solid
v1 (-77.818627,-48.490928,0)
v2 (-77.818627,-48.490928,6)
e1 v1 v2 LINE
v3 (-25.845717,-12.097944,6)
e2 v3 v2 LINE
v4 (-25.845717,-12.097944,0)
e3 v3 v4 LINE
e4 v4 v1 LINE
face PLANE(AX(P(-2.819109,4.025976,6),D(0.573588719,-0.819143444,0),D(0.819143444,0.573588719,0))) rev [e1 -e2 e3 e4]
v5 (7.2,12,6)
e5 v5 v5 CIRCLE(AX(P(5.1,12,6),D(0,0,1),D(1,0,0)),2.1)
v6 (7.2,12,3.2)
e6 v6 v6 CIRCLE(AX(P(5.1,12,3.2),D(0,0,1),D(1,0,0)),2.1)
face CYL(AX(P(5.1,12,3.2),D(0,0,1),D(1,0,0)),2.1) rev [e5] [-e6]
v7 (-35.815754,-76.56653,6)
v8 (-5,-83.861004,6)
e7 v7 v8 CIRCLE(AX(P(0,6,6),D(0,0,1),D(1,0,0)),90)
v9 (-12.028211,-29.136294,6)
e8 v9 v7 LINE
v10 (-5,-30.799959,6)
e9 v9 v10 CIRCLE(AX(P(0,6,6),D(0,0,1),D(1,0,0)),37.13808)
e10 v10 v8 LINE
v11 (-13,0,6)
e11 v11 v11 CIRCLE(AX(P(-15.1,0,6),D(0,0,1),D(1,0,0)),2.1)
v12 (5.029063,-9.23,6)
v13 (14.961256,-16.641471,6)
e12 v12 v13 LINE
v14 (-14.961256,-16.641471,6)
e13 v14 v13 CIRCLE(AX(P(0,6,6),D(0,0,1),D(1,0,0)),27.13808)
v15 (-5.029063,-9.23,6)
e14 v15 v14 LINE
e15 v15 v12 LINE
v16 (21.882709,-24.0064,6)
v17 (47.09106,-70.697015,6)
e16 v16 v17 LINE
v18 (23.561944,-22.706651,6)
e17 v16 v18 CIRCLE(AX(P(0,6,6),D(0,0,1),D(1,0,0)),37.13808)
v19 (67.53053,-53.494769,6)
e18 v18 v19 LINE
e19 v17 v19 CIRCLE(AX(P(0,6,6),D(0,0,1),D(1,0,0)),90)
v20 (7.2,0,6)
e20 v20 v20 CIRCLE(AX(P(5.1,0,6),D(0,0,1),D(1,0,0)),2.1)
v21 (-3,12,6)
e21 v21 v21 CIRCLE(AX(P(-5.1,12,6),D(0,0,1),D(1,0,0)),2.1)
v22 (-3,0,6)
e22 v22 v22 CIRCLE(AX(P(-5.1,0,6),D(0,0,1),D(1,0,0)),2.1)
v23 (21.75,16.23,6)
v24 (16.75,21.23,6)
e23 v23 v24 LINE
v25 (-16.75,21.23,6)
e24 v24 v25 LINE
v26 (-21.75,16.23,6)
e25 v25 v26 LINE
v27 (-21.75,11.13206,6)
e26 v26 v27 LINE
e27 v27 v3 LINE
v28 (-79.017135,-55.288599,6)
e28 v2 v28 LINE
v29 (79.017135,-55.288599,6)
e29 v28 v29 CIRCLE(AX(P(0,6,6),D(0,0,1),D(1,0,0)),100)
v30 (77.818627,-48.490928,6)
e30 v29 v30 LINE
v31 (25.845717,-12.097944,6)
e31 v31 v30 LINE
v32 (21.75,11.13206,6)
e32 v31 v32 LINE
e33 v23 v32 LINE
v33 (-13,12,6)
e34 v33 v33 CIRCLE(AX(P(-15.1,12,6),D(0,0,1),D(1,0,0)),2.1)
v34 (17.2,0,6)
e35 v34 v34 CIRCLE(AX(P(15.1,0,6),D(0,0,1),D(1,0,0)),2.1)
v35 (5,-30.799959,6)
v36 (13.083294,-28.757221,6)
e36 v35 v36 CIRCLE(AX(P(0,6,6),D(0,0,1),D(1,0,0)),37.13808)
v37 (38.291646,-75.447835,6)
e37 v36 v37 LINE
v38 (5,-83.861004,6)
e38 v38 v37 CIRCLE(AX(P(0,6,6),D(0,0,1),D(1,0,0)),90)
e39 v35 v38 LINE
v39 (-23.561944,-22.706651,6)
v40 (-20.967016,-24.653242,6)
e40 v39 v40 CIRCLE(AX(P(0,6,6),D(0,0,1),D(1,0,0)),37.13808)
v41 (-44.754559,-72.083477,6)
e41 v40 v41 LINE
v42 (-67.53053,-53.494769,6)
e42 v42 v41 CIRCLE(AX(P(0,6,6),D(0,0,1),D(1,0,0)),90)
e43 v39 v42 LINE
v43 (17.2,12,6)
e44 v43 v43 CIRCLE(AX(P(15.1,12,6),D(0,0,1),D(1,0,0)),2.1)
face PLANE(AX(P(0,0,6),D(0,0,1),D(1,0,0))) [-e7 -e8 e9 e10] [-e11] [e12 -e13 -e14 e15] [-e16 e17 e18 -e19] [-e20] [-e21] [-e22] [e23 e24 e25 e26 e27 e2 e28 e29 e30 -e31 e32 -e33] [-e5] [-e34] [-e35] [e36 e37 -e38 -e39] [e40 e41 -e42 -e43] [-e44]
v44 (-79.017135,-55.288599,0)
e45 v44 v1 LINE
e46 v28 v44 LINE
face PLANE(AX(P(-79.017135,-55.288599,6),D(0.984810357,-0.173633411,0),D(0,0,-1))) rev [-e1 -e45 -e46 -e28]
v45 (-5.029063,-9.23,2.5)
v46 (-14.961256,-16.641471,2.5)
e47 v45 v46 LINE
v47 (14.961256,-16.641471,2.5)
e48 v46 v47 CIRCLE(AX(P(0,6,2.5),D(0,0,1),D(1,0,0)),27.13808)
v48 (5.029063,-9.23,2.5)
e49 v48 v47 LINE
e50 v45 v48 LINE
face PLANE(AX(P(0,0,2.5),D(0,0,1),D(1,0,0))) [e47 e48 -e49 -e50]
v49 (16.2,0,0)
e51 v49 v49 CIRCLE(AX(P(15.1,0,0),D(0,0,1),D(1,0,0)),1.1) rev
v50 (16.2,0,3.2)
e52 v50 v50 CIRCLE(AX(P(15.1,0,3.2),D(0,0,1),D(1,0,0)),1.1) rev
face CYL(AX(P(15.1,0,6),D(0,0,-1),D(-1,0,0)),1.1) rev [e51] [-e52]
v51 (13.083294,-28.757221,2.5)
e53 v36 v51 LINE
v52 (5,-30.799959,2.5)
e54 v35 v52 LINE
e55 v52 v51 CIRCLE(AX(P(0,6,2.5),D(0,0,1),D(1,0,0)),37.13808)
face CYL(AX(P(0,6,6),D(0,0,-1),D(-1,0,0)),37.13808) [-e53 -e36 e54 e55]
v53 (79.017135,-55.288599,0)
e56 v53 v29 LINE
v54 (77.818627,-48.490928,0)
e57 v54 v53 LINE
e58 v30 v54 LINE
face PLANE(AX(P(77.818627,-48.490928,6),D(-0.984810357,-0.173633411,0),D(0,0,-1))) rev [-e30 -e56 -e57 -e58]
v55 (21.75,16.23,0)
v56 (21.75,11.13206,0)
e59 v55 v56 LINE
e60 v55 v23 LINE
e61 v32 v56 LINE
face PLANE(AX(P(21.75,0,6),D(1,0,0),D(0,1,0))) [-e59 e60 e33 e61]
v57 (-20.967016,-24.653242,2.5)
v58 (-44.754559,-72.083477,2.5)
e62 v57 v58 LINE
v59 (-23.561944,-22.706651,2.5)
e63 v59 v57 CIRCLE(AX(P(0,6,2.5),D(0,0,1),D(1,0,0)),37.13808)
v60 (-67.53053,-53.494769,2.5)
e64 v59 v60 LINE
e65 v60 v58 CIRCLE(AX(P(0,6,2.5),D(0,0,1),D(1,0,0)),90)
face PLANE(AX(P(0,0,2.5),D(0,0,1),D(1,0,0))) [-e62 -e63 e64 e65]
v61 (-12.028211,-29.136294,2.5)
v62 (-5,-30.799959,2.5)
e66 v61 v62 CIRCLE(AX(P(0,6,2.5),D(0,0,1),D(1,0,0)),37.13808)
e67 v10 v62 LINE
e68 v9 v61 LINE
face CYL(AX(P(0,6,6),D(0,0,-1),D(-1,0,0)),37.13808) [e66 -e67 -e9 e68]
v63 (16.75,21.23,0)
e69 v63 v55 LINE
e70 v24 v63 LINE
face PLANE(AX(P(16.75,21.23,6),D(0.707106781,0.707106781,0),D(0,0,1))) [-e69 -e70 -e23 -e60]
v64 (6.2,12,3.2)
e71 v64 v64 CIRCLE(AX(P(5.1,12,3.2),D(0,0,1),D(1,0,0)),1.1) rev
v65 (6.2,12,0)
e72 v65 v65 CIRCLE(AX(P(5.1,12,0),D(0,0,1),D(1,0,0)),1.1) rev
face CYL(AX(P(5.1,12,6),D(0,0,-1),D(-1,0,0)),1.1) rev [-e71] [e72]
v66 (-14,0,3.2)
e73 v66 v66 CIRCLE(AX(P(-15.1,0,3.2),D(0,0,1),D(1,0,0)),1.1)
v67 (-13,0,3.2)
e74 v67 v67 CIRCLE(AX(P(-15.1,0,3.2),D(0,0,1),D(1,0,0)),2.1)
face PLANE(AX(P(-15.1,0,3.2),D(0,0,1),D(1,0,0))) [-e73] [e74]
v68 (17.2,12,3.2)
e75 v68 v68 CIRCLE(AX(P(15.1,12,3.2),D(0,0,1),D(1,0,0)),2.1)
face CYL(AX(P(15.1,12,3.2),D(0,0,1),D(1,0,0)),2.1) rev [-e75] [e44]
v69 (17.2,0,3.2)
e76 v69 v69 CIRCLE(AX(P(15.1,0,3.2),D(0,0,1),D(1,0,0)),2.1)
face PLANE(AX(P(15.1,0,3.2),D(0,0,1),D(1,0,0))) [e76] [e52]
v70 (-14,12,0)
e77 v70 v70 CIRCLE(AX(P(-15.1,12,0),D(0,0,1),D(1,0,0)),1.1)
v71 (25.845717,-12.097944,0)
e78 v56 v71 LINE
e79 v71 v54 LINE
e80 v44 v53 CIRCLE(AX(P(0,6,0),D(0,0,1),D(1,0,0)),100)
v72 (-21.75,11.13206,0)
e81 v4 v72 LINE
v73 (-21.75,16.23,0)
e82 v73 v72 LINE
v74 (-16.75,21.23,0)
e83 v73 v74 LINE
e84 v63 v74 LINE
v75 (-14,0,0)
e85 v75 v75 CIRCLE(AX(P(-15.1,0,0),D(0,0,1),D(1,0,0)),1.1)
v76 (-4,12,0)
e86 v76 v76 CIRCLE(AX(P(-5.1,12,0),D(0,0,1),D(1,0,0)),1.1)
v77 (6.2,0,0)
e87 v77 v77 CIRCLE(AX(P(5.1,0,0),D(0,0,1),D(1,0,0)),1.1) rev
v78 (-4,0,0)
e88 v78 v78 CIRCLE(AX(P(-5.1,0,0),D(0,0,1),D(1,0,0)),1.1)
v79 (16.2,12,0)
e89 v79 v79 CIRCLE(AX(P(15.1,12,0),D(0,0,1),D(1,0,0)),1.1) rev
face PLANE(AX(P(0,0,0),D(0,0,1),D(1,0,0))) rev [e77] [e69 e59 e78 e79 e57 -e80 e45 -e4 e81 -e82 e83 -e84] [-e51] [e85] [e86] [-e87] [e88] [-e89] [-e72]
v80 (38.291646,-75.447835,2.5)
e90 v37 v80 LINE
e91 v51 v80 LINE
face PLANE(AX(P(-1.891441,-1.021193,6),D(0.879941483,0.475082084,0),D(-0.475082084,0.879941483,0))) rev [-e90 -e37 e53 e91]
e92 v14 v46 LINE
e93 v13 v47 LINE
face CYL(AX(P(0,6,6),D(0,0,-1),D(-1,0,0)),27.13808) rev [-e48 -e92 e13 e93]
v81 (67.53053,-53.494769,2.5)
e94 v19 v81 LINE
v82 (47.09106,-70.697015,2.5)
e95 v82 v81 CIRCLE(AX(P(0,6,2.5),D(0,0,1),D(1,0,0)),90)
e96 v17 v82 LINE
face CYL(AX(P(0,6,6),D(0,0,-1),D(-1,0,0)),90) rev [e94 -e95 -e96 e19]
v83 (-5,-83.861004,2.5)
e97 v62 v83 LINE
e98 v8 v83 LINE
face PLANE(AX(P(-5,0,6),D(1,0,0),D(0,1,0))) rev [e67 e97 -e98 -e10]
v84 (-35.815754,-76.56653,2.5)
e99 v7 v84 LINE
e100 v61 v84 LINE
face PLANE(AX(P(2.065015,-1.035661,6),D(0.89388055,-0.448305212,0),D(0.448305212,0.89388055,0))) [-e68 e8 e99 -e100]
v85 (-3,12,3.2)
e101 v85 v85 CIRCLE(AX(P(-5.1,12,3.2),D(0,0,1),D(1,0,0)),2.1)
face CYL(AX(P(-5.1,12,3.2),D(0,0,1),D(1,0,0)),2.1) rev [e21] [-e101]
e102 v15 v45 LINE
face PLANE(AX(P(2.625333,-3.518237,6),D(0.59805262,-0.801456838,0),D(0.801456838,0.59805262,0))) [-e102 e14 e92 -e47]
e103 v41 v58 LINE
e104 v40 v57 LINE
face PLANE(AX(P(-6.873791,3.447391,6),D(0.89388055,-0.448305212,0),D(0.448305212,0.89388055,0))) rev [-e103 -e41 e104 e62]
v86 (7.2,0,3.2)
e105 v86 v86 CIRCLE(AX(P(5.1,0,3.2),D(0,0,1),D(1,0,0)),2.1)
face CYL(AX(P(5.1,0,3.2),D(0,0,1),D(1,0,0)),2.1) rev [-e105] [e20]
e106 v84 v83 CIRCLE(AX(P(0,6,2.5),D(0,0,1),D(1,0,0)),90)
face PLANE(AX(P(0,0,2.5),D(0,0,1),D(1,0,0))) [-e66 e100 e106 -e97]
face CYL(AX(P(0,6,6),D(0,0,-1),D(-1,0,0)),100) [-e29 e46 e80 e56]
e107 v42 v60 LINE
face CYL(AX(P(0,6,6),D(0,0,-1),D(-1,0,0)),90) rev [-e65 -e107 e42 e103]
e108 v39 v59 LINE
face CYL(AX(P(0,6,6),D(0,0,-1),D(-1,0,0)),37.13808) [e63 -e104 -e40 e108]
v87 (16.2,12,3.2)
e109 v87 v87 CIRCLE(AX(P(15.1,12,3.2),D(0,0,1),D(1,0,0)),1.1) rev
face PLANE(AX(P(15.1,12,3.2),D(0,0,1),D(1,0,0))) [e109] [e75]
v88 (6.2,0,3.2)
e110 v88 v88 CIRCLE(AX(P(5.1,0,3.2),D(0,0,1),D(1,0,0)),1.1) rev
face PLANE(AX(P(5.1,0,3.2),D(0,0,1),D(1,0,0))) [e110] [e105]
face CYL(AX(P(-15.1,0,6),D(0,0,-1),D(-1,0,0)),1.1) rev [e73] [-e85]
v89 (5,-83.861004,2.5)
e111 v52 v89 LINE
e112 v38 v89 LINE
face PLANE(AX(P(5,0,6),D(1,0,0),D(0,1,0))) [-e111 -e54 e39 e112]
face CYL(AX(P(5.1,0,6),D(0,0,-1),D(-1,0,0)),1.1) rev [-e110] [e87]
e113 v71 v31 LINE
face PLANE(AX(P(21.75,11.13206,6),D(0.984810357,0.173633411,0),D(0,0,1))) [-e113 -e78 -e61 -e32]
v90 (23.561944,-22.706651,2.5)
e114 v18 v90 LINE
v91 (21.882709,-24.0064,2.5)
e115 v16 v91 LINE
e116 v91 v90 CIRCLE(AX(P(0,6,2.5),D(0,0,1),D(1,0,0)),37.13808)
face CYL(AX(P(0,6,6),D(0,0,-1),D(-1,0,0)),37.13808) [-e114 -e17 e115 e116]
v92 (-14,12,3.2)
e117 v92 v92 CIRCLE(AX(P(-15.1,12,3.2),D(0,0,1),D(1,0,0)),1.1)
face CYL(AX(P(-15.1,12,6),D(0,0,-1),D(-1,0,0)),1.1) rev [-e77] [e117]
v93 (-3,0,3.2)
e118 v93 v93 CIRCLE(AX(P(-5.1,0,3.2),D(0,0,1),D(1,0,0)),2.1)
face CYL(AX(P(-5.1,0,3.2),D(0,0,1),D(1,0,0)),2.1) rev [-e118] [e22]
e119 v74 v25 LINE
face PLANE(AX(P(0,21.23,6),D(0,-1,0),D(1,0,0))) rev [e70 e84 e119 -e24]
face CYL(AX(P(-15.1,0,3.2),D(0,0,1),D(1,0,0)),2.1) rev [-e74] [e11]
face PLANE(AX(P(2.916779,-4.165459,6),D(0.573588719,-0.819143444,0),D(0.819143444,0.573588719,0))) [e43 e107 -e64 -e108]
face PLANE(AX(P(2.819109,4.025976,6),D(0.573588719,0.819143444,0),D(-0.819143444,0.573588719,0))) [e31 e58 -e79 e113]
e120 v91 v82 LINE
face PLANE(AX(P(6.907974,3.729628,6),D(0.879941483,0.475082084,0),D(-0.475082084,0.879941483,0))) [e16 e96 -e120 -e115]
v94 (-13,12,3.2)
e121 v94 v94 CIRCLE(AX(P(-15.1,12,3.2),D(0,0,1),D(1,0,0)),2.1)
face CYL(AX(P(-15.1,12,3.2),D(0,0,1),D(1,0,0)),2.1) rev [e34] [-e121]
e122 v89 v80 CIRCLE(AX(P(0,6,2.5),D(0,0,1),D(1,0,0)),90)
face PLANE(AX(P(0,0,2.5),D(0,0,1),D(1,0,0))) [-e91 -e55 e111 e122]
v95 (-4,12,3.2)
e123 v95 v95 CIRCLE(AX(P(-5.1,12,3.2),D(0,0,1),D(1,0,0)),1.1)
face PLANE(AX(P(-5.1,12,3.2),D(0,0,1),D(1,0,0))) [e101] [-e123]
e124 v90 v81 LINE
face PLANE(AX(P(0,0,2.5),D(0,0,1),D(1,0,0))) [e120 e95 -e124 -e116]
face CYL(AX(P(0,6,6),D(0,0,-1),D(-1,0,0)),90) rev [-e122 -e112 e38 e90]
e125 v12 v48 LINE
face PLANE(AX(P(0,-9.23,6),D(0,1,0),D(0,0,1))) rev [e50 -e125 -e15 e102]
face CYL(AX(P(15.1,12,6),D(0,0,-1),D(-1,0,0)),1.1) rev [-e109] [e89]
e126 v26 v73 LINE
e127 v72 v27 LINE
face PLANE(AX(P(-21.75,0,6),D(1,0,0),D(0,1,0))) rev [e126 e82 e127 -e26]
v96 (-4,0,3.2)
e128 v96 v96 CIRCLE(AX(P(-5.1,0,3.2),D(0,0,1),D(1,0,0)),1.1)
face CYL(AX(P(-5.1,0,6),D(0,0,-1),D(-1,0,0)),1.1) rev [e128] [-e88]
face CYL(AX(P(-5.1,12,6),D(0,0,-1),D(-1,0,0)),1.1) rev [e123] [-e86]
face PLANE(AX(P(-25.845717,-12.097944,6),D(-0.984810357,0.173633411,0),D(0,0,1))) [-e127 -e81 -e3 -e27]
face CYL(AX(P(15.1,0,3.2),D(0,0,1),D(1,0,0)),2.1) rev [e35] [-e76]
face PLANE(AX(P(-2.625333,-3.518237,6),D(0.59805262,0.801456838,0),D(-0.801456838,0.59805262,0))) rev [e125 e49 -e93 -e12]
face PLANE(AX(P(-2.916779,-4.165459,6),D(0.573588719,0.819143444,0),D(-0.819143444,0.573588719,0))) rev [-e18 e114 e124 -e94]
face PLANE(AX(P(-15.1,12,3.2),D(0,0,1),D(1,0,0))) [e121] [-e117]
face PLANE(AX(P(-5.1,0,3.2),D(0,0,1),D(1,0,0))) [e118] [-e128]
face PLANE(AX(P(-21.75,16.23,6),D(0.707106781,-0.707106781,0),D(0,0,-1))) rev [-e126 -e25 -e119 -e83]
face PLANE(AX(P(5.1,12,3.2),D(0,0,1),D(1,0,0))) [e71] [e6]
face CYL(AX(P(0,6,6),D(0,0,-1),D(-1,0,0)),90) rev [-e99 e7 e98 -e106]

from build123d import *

# Parameters (mm, degrees)
SKETCH_1_R          = 1.1
EXTRUDE_1_DEPTH     = 6
EXTRUDE_2_DEPTH     = 2.5
SKETCH_2_R          = 2.1
CUT_EXTRUDE_1_DEPTH = 2.8
CHAMFER_1_SIZE      = 5
CHAMFER_2_SIZE      = 5
CHAMFER_2_SIZE_2    = 20.362059886


with BuildPart() as part:
    # 스케치1 → 보스-돌출1 (new body)
    # profile 1 of 3: a face of its own
    with BuildSketch(Plane.XY):
        with BuildLine():
            Line((81.914344353, -51.358871931), (21.75, -9.23))
            Line((21.75, -9.23), (5.029063305, -9.23))
            Line((5.029063305, -9.23), (14.961256377, -16.641470968))
            ThreePointArc((14.961256377, -16.641470968), (0, -21.138080256), (-14.961256377, -16.641470968))
            Line((-14.961256377, -16.641470968), (-5.029063305, -9.23))
            Line((-5.029063305, -9.23), (-21.75, -9.23))
            Line((-21.75, -9.23), (-81.914344353, -51.358871931))
            ThreePointArc((-81.914344353, -51.358871931), (0, -94), (81.914344353, -51.358871931))
        make_face()
        with BuildLine():
            ThreePointArc((-23.561943602, -22.706651125), (-22.285743682, -23.708292339), (-20.967016307, -24.653241791))
            Line((-20.967016307, -24.653241791), (-44.754559097, -72.083477382))
            ThreePointArc((-44.754559097, -72.083477382), (-56.906680731, -63.725387688), (-67.530529729, -53.494769135))
            Line((-67.530529729, -53.494769135), (-23.561943602, -22.706651125))
        make_face(mode=Mode.SUBTRACT)
        with BuildLine():
            ThreePointArc((-12.028210812, -29.136293911), (-8.554644148, -30.139383899), (-5, -30.799959309))
            Line((-5, -30.799959309), (-5, -83.861003778))
            ThreePointArc((-5, -83.861003778), (-20.731227032, -81.579770642), (-35.815753602, -76.566529502))
            Line((-35.815753602, -76.566529502), (-12.028210812, -29.136293911))
        make_face(mode=Mode.SUBTRACT)
        with BuildLine():
            Line((5, -83.861003778), (5, -30.799959309))
            ThreePointArc((5, -30.799959309), (9.099152416, -30.006144343), (13.08329394, -28.757221189))
            Line((13.08329394, -28.757221189), (38.291645519, -75.447835351))
            ThreePointArc((38.291645519, -75.447835351), (22.050782156, -81.256879421), (5, -83.861003778))
        make_face(mode=Mode.SUBTRACT)
        with BuildLine():
            ThreePointArc((21.88270877, -24.006400351), (22.731617723, -23.36853011), (23.561943602, -22.706651125))
            Line((23.561943602, -22.706651125), (67.530529729, -53.494769135))
            ThreePointArc((67.530529729, -53.494769135), (57.952623233, -62.858503182), (47.09106035, -70.697014513))
            Line((47.09106035, -70.697014513), (21.88270877, -24.006400351))
        make_face(mode=Mode.SUBTRACT)
    # profile 2 of 3: a face of its own
    with BuildSketch(Plane.XY):
        Polygon((5.029063305, -9.23), (21.75, -9.23), (0, 6), (-21.75, -9.23), (-5.029063305, -9.23), align=None)
        with Locations((-5.1, 0)):
            Circle(SKETCH_1_R, mode=Mode.SUBTRACT)
        with Locations((5.1, 0)):
            Circle(SKETCH_1_R, mode=Mode.SUBTRACT)
    # profile 3 of 3: a face of its own
    with BuildSketch(Plane.XY):
        Polygon((21.75, -9.23), (21.75, 21.23), (-21.75, 21.23), (-21.75, -9.23), (0, 6), align=None)
        with Locations((-15.1, 0)):
            Circle(SKETCH_1_R, mode=Mode.SUBTRACT)
        with Locations((-15.1, 12)):
            Circle(SKETCH_1_R, mode=Mode.SUBTRACT)
        with Locations((-5.1, 12)):
            Circle(SKETCH_1_R, mode=Mode.SUBTRACT)
        with Locations((15.1, 0)):
            Circle(SKETCH_1_R, mode=Mode.SUBTRACT)
        with Locations((5.1, 12)):
            Circle(SKETCH_1_R, mode=Mode.SUBTRACT)
        with Locations((15.1, 12)):
            Circle(SKETCH_1_R, mode=Mode.SUBTRACT)
    extrude(amount=EXTRUDE_1_DEPTH)

    # 스케치1<3> → 보스-돌출2 (add)
    with BuildSketch(Plane.XY):
        with BuildLine():
            Line((-23.561943602, -22.706651125), (-67.530529729, -53.494769135))
            ThreePointArc((-67.530529729, -53.494769135), (-56.906680731, -63.725387688), (-44.754559097, -72.083477382))
            Line((-44.754559097, -72.083477382), (-20.967016307, -24.653241791))
            ThreePointArc((-20.967016307, -24.653241791), (-22.285743682, -23.708292339), (-23.561943602, -22.706651125))
        make_face()
        with BuildLine():
            ThreePointArc((-12.028210812, -29.136293911), (-8.554644148, -30.139383899), (-5, -30.799959309))
            Line((-5, -30.799959309), (-5, -83.861003778))
            ThreePointArc((-5, -83.861003778), (-20.731227032, -81.579770642), (-35.815753602, -76.566529502))
            Line((-35.815753602, -76.566529502), (-12.028210812, -29.136293911))
        make_face()
        with BuildLine():
            ThreePointArc((5, -30.799959309), (9.099152416, -30.006144343), (13.08329394, -28.757221189))
            Line((13.08329394, -28.757221189), (38.291645519, -75.447835351))
            ThreePointArc((38.291645519, -75.447835351), (22.050782156, -81.256879421), (5, -83.861003778))
            Line((5, -83.861003778), (5, -30.799959309))
        make_face()
        with BuildLine():
            ThreePointArc((21.88270877, -24.006400351), (22.731617723, -23.36853011), (23.561943602, -22.706651125))
            Line((23.561943602, -22.706651125), (67.530529729, -53.494769135))
            ThreePointArc((67.530529729, -53.494769135), (57.952623233, -62.858503182), (47.09106035, -70.697014513))
            Line((47.09106035, -70.697014513), (21.88270877, -24.006400351))
        make_face()
        with BuildLine():
            Line((14.961256377, -16.641470968), (5.029063305, -9.23))
            Line((5.029063305, -9.23), (-5.029063305, -9.23))
            Line((-5.029063305, -9.23), (-14.961256377, -16.641470968))
            ThreePointArc((-14.961256377, -16.641470968), (0, -21.138080256), (14.961256377, -16.641470968))
        make_face()
    extrude(amount=EXTRUDE_2_DEPTH)

    # 스케치2 → 컷-돌출1 (cut)
    with BuildSketch(Plane.XY.offset(6)):
        with Locations((-15.1, 12)):
            Circle(SKETCH_2_R)
        with Locations((-5.1, 12)):
            Circle(SKETCH_2_R)
        with Locations((5.1, 12)):
            Circle(SKETCH_2_R)
        with Locations((15.1, 12)):
            Circle(SKETCH_2_R)
        with Locations((15.1, 0)):
            Circle(SKETCH_2_R)
        with Locations((5.1, 0)):
            Circle(SKETCH_2_R)
        with Locations((-5.1, 0)):
            Circle(SKETCH_2_R)
        with Locations((-15.1, 0)):
            Circle(SKETCH_2_R)
    extrude(amount=-CUT_EXTRUDE_1_DEPTH, mode=Mode.SUBTRACT)

    # 모따기1
    chamfer_1_edges = [part.edges().sort_by_distance(p)[0] for p in [
        (-21.75, 21.23, 3),
        (21.75, 21.23, 3),
    ]]
    chamfer(chamfer_1_edges, length=CHAMFER_1_SIZE)

    # 모따기2
    # the kernel refuses this chamfer: 20.362059886, 5 mm, written as the material it adds along each edge
    with BuildSketch(Plane(origin=(-21.75, -9.23, 0), x_dir=(-0.8191434435315306, -0.573588719309669, 0), z_dir=(0, 0, 1))) as chamfer_2_piece_1:
        Polygon((CHAMFER_2_SIZE, 0), (-CHAMFER_2_SIZE_2 * 0.573588719322, -CHAMFER_2_SIZE_2 * 0.819143443549), (0, 0), align=None)
    extrude(amount=6)
    with BuildSketch(Plane(origin=(21.75, -9.23, 0), x_dir=(0, 1, 0), z_dir=(0, 0, 1))) as chamfer_2_piece_2:
        Polygon((CHAMFER_2_SIZE_2, 0), (-CHAMFER_2_SIZE * 0.57358871931, -CHAMFER_2_SIZE * 0.819143443532), (0, 0), align=None)
    extrude(amount=6)
    # the kernel refuses this chamfer: 20.362059886, 5 mm, written as the material it takes off along each edge
    with BuildSketch(Plane(origin=(81.914344353, -51.358871931, -12.85841494), x_dir=(-0.8191434435315298, 0.5735887193096699, 0), z_dir=(0, 0, 1))) as chamfer_2_2_piece_1:
        with BuildLine():
            Line((CHAMFER_2_SIZE, 0), (0.119182901, 4.880817099))
            ThreePointArc((0.119182901, 4.880817099), (0.031506692, 2.510048959), (0, 0))
            Line((0, 0), (CHAMFER_2_SIZE, 0))
        make_face()
    extrude(amount=31.71682988, mode=Mode.SUBTRACT)
    with BuildSketch(Plane(origin=(-81.914344353, -51.358871931, -12.85841494), x_dir=(0.5934141945147567, -0.8048972566411209, 0), z_dir=(0, 0, 1))) as chamfer_2_2_piece_2:
        with BuildLine():
            Line((4.882272025, 0), (CHAMFER_2_SIZE * 0.0244113601227, CHAMFER_2_SIZE * 0.999701998346))
            Line((CHAMFER_2_SIZE * 0.0244113601227, CHAMFER_2_SIZE * 0.999701998346), (0, 0))
            ThreePointArc((0, 0), (2.510070082, -0.029776406), (4.882272025, 0))
        make_face()
    extrude(amount=31.71682988, mode=Mode.SUBTRACT)


solid = part.part
